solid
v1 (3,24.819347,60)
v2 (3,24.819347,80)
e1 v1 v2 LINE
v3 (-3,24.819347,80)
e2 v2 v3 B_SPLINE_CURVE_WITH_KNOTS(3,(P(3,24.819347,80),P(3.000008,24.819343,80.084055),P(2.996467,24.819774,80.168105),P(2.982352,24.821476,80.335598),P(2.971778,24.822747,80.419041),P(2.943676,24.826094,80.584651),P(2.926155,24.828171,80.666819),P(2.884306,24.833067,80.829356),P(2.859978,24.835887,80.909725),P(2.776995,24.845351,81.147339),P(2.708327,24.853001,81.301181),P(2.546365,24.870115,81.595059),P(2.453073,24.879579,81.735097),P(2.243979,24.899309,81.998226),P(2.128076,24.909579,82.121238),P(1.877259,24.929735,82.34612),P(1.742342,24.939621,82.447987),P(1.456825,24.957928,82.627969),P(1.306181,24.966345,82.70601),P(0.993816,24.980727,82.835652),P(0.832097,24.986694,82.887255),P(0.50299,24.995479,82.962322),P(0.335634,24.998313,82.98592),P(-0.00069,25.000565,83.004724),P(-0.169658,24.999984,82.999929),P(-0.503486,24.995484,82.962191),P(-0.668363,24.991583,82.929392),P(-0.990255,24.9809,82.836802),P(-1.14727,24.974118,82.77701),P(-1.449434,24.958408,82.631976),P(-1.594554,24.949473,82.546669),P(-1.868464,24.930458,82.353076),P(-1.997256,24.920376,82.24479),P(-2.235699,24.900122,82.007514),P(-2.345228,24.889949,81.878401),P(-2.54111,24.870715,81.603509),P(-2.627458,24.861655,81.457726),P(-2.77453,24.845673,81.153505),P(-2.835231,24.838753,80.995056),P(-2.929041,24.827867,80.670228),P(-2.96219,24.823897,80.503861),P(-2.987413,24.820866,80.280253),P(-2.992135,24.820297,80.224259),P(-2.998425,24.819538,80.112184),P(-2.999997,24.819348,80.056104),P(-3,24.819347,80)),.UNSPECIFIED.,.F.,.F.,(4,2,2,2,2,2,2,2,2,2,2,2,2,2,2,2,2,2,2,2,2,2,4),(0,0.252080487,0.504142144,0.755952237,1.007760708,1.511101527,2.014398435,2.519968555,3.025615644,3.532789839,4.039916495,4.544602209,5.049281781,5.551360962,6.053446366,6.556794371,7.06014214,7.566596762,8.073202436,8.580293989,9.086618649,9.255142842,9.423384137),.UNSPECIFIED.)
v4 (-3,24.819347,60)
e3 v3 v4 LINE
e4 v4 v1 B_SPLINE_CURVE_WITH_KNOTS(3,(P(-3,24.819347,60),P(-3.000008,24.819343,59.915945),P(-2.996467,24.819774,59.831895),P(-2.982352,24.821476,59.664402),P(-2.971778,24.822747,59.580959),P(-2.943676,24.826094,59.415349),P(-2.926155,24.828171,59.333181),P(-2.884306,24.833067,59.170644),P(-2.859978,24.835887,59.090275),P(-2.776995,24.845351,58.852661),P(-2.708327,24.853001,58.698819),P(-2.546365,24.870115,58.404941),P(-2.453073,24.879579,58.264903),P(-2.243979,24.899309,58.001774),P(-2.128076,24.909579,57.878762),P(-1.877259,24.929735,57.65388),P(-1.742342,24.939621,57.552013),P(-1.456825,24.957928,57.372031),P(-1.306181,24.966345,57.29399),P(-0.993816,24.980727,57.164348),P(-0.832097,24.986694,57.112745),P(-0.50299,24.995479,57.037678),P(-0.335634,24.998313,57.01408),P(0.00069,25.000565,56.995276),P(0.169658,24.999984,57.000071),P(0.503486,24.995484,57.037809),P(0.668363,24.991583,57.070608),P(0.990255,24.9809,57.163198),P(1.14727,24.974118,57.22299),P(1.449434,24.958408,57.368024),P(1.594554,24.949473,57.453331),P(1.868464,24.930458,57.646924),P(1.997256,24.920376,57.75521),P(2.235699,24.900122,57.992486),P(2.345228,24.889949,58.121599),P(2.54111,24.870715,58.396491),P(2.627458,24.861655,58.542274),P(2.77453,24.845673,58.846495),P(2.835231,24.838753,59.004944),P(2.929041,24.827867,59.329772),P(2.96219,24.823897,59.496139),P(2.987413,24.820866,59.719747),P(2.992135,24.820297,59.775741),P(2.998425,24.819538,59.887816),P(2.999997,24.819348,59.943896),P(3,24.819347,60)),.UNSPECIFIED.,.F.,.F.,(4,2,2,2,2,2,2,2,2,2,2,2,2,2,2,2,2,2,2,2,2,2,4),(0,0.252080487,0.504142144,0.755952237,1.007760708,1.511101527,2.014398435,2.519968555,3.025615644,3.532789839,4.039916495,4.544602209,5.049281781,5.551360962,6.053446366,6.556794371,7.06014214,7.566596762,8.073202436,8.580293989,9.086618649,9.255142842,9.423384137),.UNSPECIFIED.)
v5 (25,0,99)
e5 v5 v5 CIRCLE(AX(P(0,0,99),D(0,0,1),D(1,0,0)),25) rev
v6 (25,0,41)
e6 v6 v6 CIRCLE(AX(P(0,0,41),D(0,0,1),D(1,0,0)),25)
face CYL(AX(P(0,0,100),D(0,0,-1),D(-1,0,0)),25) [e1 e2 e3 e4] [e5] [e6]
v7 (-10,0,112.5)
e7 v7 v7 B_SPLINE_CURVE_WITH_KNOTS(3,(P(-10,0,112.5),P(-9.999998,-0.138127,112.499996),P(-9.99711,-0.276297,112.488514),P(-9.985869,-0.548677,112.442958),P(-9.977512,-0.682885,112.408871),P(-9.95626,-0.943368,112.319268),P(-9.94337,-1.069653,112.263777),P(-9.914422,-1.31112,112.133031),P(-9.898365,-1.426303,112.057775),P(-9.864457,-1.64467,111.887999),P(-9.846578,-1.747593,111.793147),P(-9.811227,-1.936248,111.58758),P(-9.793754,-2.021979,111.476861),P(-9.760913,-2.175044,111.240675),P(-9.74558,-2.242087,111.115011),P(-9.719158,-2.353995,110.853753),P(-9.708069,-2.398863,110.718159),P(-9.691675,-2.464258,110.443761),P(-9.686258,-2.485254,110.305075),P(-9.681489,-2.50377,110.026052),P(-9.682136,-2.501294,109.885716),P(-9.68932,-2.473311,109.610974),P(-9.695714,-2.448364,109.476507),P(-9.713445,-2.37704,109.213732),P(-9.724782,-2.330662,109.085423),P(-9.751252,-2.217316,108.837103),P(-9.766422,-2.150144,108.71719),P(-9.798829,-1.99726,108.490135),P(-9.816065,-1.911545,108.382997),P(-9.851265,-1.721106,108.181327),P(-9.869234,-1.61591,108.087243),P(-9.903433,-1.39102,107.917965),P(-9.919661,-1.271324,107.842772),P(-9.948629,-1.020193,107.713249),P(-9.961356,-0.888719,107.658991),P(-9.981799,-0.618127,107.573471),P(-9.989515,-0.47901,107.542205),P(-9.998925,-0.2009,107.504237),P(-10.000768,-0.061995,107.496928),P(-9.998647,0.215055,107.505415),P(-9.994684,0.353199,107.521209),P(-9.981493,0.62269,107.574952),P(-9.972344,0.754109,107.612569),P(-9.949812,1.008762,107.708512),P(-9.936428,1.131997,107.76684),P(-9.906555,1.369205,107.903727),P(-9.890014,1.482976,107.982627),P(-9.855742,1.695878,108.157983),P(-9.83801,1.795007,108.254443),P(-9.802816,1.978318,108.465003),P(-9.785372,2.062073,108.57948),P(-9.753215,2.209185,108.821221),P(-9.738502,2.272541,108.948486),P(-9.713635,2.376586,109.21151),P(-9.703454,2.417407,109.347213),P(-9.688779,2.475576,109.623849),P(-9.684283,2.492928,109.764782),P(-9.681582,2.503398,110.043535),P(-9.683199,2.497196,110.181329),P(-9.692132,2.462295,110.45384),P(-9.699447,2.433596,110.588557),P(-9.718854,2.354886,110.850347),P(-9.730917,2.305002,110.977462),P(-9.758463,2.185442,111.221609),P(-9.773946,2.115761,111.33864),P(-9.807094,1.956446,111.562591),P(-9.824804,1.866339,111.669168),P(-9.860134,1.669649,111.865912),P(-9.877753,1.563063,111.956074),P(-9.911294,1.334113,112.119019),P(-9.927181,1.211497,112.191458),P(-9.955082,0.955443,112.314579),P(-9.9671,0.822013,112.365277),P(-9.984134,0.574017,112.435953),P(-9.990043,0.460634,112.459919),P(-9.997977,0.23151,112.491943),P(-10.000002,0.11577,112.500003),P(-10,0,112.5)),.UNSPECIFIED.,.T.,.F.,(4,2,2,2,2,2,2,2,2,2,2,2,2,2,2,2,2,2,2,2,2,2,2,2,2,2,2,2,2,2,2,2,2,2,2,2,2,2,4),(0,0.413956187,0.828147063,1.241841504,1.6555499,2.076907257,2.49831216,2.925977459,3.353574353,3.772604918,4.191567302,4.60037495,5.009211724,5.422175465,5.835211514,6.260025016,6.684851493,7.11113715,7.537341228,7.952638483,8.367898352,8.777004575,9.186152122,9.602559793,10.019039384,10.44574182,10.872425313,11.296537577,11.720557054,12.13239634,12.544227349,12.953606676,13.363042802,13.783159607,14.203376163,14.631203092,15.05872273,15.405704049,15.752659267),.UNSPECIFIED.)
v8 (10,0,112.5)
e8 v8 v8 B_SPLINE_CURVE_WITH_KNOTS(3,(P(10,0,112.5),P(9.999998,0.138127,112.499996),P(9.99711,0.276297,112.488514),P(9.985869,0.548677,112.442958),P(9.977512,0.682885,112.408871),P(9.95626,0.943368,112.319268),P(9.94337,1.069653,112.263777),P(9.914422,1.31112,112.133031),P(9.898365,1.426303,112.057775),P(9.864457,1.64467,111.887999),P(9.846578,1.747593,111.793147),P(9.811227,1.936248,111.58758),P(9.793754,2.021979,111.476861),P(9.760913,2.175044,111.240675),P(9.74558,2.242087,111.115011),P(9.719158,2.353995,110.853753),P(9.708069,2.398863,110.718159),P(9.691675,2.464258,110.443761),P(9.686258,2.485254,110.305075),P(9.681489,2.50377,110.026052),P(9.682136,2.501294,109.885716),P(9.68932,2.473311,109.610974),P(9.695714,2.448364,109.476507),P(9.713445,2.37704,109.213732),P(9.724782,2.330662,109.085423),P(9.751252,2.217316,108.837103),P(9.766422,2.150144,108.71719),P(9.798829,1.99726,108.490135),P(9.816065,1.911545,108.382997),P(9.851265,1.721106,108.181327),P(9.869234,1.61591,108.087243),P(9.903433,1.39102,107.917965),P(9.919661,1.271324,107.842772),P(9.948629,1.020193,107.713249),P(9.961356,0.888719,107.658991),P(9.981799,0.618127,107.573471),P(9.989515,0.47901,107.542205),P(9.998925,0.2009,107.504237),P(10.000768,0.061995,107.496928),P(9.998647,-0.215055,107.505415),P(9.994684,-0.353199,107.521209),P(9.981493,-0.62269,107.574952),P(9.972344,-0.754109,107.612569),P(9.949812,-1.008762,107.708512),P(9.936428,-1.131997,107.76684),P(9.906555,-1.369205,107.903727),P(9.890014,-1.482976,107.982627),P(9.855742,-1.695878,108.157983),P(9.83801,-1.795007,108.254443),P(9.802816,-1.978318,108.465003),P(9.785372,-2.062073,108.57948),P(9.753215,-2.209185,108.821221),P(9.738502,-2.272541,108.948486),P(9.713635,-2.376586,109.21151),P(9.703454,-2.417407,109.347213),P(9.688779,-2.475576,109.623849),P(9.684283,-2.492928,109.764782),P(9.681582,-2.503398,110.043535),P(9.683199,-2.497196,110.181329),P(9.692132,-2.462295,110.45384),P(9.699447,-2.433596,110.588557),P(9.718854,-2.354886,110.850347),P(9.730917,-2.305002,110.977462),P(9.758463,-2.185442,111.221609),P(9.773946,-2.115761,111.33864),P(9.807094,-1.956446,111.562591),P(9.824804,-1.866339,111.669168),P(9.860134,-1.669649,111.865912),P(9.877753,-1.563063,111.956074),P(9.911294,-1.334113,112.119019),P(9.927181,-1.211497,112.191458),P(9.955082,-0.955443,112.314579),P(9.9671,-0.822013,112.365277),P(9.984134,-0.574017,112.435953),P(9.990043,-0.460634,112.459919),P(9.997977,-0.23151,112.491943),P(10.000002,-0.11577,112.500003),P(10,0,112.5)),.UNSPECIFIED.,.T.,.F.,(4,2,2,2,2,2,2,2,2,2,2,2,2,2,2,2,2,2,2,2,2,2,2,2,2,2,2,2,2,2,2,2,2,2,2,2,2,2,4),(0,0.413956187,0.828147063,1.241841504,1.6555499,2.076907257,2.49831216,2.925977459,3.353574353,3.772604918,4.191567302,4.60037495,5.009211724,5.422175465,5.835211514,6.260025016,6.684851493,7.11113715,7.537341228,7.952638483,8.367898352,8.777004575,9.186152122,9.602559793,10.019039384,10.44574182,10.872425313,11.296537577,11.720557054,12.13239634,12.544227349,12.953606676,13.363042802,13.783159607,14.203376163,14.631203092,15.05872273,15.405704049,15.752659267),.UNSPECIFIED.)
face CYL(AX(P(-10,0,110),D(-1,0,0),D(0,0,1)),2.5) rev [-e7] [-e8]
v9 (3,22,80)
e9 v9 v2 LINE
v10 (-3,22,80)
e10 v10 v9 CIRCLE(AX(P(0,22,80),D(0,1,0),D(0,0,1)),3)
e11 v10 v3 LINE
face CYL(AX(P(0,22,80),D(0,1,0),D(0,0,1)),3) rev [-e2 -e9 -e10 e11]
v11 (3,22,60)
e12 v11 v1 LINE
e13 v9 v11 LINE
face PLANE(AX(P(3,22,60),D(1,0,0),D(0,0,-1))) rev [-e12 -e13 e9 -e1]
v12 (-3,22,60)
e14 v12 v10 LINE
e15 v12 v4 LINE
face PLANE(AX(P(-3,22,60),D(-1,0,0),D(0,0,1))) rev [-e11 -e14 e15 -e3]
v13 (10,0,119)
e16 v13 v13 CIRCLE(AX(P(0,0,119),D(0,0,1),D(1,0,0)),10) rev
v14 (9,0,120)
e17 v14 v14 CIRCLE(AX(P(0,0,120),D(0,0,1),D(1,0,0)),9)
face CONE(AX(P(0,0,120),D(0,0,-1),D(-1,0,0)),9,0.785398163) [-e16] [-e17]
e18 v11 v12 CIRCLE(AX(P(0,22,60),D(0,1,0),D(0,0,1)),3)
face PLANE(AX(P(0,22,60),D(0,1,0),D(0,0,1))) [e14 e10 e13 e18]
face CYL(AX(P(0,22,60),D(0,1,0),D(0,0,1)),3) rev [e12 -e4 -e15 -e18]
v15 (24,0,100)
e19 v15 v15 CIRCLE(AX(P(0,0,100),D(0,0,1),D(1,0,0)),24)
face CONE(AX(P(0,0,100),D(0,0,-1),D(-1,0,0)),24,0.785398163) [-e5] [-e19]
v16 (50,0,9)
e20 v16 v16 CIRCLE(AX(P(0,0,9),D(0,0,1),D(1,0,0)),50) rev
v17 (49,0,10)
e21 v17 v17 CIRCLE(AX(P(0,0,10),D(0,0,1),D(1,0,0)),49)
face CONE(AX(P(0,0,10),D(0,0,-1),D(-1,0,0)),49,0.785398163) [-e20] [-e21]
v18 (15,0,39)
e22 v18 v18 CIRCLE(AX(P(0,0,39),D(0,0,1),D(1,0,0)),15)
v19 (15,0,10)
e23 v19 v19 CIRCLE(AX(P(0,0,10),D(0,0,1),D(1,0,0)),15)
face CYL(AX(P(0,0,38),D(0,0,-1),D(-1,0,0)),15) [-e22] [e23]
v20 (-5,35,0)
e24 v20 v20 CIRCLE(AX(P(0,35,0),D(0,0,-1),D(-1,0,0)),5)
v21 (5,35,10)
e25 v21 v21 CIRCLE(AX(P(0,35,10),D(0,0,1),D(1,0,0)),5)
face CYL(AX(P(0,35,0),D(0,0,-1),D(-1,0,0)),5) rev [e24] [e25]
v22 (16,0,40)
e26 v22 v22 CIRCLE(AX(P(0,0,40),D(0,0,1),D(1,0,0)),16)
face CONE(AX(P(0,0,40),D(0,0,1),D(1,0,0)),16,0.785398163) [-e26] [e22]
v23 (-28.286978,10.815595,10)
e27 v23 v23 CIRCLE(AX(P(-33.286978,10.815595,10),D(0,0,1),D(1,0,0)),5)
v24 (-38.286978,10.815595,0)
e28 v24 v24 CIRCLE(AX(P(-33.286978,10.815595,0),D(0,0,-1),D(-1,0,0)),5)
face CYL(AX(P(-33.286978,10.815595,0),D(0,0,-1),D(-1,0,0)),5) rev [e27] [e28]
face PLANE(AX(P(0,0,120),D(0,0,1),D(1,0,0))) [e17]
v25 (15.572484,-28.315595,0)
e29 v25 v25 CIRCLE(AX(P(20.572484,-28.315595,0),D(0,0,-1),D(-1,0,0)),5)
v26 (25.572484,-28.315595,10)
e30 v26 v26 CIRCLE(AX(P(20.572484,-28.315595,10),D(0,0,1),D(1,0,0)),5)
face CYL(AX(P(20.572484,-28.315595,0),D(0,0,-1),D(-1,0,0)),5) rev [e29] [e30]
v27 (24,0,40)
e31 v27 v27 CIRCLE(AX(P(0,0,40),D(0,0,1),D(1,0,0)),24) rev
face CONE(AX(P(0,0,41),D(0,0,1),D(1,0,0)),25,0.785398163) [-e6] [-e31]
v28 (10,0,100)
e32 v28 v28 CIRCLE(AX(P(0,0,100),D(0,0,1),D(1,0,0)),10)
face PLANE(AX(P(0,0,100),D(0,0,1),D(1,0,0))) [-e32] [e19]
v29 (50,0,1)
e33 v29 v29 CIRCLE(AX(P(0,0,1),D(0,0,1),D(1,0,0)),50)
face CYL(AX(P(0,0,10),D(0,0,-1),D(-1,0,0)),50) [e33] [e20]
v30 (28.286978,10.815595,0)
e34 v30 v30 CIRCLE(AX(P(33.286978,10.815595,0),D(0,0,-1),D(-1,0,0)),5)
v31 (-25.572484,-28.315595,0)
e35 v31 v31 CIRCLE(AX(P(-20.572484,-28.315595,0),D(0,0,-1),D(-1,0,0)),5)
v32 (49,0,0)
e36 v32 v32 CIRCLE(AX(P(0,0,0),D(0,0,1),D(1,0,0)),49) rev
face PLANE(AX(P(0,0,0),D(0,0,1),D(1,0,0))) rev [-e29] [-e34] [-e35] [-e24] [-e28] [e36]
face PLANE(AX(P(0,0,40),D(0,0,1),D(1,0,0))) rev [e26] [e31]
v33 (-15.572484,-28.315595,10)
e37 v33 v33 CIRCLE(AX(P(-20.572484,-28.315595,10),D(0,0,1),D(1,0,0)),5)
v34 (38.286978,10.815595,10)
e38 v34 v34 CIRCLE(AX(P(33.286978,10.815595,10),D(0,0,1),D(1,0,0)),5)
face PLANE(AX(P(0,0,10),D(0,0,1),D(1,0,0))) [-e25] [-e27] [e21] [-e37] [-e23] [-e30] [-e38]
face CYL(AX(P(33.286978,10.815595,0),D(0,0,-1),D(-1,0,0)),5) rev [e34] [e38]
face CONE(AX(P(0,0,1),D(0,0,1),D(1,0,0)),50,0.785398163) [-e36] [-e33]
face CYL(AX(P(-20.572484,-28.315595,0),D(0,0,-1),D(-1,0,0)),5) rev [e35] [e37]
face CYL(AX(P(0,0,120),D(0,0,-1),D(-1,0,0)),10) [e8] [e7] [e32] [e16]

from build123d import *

# Parameters (mm, degrees)
SKETCH_1_R              = 50
EXTRUDE_1_DEPTH         = 10
SKETCH_2_R              = 15
EXTRUDE_2_DEPTH         = 28
SKETCH_3_R              = 16
EXTRUDE_3_DEPTH         = 2
SKETCH_4_R              = 25
EXTRUDE_4_DEPTH         = 60
SKETCH_5_R              = 10
EXTRUDE_5_DEPTH         = 20
CHAMFER_1_SIZE          = 1
HOLE_WIZARD_10_0_10_1_D = 10
CUT_EXTRUDE_1_DEPTH     = 3
HOLE_WIZARD_5_0_5_1_D   = 5


# Read off the part's stored shape, not the designer's step: 구배27
with BuildPart() as part:
    # 스케치1 → 보스-돌출1 (new body)
    with BuildSketch(Plane.XY):
        Circle(SKETCH_1_R)
    extrude(amount=EXTRUDE_1_DEPTH)

    # 스케치2 → 보스-돌출2 (add)
    with BuildSketch(Plane.XY.offset(10)):
        Circle(SKETCH_2_R)
    extrude(amount=EXTRUDE_2_DEPTH)

    # 스케치3 → 보스-돌출3 (add)
    with BuildSketch(Plane.XY.offset(38)):
        Circle(SKETCH_3_R)
    extrude(amount=EXTRUDE_3_DEPTH)

    # 스케치4 → 보스-돌출4 (add)
    with BuildSketch(Plane.XY.offset(40)):
        Circle(SKETCH_4_R)
    extrude(amount=EXTRUDE_4_DEPTH)

    # 스케치5 → 보스-돌출5 (add)
    with BuildSketch(Plane.XY.offset(100)):
        Circle(SKETCH_5_R)
    extrude(amount=EXTRUDE_5_DEPTH)

    # 모따기1
    chamfer_1_edges = [part.edges().sort_by_distance(p)[0] for p in [
        (-25, 0, 40),
        (-25, 0, 100),
        (-50, 0, 0),
        (-10, 0, 120),
        (-50, 0, 10),
    ]]
    chamfer(chamfer_1_edges, length=CHAMFER_1_SIZE)

    # 구배27 outline → 구배27 (revolve, cut)
    with BuildSketch(Plane.XZ):
        Polygon((16, 40), (15, 39), (15, 38), (16, 38), align=None)
    revolve(axis=Axis((0, 0, 0), (0, 0, 1)), mode=Mode.SUBTRACT)

    # Ø10.0 (10) 지름 구멍1 (through all)
    with Locations(Plane(origin=(0, 0, 0), x_dir=(-1, 0, 0), z_dir=(0, 0, -1))):
        with Locations((0, 35), (-33.28697807, 10.815594803), (-20.57248383, -28.315594803), (20.57248383, -28.315594803), (33.28697807, 10.815594803)):
            Hole(HOLE_WIZARD_10_0_10_1_D / 2)

    # 스케치17 → 컷-돌출1 (cut)
    with BuildSketch(Plane(origin=(0, 25, 0), x_dir=(1, 0, 0), z_dir=(0, 1, 0))):
        with BuildLine():
            Line((-3, -60), (-3, -80))
            ThreePointArc((-3, -80), (0, -83), (3, -80))
            Line((3, -80), (3, -60))
            ThreePointArc((3, -60), (0, -57), (-3, -60))
        make_face()
    extrude(amount=-CUT_EXTRUDE_1_DEPTH, mode=Mode.SUBTRACT)

    # Ø5.0 (5) 지름 구멍1 (through all)
    with Locations(Plane(origin=(-10, 0, 0), x_dir=(0, 0, -1), z_dir=(-1, 0, 0))):
        with Locations((-110, 0)):
            Hole(HOLE_WIZARD_5_0_5_1_D / 2)


solid = part.part
